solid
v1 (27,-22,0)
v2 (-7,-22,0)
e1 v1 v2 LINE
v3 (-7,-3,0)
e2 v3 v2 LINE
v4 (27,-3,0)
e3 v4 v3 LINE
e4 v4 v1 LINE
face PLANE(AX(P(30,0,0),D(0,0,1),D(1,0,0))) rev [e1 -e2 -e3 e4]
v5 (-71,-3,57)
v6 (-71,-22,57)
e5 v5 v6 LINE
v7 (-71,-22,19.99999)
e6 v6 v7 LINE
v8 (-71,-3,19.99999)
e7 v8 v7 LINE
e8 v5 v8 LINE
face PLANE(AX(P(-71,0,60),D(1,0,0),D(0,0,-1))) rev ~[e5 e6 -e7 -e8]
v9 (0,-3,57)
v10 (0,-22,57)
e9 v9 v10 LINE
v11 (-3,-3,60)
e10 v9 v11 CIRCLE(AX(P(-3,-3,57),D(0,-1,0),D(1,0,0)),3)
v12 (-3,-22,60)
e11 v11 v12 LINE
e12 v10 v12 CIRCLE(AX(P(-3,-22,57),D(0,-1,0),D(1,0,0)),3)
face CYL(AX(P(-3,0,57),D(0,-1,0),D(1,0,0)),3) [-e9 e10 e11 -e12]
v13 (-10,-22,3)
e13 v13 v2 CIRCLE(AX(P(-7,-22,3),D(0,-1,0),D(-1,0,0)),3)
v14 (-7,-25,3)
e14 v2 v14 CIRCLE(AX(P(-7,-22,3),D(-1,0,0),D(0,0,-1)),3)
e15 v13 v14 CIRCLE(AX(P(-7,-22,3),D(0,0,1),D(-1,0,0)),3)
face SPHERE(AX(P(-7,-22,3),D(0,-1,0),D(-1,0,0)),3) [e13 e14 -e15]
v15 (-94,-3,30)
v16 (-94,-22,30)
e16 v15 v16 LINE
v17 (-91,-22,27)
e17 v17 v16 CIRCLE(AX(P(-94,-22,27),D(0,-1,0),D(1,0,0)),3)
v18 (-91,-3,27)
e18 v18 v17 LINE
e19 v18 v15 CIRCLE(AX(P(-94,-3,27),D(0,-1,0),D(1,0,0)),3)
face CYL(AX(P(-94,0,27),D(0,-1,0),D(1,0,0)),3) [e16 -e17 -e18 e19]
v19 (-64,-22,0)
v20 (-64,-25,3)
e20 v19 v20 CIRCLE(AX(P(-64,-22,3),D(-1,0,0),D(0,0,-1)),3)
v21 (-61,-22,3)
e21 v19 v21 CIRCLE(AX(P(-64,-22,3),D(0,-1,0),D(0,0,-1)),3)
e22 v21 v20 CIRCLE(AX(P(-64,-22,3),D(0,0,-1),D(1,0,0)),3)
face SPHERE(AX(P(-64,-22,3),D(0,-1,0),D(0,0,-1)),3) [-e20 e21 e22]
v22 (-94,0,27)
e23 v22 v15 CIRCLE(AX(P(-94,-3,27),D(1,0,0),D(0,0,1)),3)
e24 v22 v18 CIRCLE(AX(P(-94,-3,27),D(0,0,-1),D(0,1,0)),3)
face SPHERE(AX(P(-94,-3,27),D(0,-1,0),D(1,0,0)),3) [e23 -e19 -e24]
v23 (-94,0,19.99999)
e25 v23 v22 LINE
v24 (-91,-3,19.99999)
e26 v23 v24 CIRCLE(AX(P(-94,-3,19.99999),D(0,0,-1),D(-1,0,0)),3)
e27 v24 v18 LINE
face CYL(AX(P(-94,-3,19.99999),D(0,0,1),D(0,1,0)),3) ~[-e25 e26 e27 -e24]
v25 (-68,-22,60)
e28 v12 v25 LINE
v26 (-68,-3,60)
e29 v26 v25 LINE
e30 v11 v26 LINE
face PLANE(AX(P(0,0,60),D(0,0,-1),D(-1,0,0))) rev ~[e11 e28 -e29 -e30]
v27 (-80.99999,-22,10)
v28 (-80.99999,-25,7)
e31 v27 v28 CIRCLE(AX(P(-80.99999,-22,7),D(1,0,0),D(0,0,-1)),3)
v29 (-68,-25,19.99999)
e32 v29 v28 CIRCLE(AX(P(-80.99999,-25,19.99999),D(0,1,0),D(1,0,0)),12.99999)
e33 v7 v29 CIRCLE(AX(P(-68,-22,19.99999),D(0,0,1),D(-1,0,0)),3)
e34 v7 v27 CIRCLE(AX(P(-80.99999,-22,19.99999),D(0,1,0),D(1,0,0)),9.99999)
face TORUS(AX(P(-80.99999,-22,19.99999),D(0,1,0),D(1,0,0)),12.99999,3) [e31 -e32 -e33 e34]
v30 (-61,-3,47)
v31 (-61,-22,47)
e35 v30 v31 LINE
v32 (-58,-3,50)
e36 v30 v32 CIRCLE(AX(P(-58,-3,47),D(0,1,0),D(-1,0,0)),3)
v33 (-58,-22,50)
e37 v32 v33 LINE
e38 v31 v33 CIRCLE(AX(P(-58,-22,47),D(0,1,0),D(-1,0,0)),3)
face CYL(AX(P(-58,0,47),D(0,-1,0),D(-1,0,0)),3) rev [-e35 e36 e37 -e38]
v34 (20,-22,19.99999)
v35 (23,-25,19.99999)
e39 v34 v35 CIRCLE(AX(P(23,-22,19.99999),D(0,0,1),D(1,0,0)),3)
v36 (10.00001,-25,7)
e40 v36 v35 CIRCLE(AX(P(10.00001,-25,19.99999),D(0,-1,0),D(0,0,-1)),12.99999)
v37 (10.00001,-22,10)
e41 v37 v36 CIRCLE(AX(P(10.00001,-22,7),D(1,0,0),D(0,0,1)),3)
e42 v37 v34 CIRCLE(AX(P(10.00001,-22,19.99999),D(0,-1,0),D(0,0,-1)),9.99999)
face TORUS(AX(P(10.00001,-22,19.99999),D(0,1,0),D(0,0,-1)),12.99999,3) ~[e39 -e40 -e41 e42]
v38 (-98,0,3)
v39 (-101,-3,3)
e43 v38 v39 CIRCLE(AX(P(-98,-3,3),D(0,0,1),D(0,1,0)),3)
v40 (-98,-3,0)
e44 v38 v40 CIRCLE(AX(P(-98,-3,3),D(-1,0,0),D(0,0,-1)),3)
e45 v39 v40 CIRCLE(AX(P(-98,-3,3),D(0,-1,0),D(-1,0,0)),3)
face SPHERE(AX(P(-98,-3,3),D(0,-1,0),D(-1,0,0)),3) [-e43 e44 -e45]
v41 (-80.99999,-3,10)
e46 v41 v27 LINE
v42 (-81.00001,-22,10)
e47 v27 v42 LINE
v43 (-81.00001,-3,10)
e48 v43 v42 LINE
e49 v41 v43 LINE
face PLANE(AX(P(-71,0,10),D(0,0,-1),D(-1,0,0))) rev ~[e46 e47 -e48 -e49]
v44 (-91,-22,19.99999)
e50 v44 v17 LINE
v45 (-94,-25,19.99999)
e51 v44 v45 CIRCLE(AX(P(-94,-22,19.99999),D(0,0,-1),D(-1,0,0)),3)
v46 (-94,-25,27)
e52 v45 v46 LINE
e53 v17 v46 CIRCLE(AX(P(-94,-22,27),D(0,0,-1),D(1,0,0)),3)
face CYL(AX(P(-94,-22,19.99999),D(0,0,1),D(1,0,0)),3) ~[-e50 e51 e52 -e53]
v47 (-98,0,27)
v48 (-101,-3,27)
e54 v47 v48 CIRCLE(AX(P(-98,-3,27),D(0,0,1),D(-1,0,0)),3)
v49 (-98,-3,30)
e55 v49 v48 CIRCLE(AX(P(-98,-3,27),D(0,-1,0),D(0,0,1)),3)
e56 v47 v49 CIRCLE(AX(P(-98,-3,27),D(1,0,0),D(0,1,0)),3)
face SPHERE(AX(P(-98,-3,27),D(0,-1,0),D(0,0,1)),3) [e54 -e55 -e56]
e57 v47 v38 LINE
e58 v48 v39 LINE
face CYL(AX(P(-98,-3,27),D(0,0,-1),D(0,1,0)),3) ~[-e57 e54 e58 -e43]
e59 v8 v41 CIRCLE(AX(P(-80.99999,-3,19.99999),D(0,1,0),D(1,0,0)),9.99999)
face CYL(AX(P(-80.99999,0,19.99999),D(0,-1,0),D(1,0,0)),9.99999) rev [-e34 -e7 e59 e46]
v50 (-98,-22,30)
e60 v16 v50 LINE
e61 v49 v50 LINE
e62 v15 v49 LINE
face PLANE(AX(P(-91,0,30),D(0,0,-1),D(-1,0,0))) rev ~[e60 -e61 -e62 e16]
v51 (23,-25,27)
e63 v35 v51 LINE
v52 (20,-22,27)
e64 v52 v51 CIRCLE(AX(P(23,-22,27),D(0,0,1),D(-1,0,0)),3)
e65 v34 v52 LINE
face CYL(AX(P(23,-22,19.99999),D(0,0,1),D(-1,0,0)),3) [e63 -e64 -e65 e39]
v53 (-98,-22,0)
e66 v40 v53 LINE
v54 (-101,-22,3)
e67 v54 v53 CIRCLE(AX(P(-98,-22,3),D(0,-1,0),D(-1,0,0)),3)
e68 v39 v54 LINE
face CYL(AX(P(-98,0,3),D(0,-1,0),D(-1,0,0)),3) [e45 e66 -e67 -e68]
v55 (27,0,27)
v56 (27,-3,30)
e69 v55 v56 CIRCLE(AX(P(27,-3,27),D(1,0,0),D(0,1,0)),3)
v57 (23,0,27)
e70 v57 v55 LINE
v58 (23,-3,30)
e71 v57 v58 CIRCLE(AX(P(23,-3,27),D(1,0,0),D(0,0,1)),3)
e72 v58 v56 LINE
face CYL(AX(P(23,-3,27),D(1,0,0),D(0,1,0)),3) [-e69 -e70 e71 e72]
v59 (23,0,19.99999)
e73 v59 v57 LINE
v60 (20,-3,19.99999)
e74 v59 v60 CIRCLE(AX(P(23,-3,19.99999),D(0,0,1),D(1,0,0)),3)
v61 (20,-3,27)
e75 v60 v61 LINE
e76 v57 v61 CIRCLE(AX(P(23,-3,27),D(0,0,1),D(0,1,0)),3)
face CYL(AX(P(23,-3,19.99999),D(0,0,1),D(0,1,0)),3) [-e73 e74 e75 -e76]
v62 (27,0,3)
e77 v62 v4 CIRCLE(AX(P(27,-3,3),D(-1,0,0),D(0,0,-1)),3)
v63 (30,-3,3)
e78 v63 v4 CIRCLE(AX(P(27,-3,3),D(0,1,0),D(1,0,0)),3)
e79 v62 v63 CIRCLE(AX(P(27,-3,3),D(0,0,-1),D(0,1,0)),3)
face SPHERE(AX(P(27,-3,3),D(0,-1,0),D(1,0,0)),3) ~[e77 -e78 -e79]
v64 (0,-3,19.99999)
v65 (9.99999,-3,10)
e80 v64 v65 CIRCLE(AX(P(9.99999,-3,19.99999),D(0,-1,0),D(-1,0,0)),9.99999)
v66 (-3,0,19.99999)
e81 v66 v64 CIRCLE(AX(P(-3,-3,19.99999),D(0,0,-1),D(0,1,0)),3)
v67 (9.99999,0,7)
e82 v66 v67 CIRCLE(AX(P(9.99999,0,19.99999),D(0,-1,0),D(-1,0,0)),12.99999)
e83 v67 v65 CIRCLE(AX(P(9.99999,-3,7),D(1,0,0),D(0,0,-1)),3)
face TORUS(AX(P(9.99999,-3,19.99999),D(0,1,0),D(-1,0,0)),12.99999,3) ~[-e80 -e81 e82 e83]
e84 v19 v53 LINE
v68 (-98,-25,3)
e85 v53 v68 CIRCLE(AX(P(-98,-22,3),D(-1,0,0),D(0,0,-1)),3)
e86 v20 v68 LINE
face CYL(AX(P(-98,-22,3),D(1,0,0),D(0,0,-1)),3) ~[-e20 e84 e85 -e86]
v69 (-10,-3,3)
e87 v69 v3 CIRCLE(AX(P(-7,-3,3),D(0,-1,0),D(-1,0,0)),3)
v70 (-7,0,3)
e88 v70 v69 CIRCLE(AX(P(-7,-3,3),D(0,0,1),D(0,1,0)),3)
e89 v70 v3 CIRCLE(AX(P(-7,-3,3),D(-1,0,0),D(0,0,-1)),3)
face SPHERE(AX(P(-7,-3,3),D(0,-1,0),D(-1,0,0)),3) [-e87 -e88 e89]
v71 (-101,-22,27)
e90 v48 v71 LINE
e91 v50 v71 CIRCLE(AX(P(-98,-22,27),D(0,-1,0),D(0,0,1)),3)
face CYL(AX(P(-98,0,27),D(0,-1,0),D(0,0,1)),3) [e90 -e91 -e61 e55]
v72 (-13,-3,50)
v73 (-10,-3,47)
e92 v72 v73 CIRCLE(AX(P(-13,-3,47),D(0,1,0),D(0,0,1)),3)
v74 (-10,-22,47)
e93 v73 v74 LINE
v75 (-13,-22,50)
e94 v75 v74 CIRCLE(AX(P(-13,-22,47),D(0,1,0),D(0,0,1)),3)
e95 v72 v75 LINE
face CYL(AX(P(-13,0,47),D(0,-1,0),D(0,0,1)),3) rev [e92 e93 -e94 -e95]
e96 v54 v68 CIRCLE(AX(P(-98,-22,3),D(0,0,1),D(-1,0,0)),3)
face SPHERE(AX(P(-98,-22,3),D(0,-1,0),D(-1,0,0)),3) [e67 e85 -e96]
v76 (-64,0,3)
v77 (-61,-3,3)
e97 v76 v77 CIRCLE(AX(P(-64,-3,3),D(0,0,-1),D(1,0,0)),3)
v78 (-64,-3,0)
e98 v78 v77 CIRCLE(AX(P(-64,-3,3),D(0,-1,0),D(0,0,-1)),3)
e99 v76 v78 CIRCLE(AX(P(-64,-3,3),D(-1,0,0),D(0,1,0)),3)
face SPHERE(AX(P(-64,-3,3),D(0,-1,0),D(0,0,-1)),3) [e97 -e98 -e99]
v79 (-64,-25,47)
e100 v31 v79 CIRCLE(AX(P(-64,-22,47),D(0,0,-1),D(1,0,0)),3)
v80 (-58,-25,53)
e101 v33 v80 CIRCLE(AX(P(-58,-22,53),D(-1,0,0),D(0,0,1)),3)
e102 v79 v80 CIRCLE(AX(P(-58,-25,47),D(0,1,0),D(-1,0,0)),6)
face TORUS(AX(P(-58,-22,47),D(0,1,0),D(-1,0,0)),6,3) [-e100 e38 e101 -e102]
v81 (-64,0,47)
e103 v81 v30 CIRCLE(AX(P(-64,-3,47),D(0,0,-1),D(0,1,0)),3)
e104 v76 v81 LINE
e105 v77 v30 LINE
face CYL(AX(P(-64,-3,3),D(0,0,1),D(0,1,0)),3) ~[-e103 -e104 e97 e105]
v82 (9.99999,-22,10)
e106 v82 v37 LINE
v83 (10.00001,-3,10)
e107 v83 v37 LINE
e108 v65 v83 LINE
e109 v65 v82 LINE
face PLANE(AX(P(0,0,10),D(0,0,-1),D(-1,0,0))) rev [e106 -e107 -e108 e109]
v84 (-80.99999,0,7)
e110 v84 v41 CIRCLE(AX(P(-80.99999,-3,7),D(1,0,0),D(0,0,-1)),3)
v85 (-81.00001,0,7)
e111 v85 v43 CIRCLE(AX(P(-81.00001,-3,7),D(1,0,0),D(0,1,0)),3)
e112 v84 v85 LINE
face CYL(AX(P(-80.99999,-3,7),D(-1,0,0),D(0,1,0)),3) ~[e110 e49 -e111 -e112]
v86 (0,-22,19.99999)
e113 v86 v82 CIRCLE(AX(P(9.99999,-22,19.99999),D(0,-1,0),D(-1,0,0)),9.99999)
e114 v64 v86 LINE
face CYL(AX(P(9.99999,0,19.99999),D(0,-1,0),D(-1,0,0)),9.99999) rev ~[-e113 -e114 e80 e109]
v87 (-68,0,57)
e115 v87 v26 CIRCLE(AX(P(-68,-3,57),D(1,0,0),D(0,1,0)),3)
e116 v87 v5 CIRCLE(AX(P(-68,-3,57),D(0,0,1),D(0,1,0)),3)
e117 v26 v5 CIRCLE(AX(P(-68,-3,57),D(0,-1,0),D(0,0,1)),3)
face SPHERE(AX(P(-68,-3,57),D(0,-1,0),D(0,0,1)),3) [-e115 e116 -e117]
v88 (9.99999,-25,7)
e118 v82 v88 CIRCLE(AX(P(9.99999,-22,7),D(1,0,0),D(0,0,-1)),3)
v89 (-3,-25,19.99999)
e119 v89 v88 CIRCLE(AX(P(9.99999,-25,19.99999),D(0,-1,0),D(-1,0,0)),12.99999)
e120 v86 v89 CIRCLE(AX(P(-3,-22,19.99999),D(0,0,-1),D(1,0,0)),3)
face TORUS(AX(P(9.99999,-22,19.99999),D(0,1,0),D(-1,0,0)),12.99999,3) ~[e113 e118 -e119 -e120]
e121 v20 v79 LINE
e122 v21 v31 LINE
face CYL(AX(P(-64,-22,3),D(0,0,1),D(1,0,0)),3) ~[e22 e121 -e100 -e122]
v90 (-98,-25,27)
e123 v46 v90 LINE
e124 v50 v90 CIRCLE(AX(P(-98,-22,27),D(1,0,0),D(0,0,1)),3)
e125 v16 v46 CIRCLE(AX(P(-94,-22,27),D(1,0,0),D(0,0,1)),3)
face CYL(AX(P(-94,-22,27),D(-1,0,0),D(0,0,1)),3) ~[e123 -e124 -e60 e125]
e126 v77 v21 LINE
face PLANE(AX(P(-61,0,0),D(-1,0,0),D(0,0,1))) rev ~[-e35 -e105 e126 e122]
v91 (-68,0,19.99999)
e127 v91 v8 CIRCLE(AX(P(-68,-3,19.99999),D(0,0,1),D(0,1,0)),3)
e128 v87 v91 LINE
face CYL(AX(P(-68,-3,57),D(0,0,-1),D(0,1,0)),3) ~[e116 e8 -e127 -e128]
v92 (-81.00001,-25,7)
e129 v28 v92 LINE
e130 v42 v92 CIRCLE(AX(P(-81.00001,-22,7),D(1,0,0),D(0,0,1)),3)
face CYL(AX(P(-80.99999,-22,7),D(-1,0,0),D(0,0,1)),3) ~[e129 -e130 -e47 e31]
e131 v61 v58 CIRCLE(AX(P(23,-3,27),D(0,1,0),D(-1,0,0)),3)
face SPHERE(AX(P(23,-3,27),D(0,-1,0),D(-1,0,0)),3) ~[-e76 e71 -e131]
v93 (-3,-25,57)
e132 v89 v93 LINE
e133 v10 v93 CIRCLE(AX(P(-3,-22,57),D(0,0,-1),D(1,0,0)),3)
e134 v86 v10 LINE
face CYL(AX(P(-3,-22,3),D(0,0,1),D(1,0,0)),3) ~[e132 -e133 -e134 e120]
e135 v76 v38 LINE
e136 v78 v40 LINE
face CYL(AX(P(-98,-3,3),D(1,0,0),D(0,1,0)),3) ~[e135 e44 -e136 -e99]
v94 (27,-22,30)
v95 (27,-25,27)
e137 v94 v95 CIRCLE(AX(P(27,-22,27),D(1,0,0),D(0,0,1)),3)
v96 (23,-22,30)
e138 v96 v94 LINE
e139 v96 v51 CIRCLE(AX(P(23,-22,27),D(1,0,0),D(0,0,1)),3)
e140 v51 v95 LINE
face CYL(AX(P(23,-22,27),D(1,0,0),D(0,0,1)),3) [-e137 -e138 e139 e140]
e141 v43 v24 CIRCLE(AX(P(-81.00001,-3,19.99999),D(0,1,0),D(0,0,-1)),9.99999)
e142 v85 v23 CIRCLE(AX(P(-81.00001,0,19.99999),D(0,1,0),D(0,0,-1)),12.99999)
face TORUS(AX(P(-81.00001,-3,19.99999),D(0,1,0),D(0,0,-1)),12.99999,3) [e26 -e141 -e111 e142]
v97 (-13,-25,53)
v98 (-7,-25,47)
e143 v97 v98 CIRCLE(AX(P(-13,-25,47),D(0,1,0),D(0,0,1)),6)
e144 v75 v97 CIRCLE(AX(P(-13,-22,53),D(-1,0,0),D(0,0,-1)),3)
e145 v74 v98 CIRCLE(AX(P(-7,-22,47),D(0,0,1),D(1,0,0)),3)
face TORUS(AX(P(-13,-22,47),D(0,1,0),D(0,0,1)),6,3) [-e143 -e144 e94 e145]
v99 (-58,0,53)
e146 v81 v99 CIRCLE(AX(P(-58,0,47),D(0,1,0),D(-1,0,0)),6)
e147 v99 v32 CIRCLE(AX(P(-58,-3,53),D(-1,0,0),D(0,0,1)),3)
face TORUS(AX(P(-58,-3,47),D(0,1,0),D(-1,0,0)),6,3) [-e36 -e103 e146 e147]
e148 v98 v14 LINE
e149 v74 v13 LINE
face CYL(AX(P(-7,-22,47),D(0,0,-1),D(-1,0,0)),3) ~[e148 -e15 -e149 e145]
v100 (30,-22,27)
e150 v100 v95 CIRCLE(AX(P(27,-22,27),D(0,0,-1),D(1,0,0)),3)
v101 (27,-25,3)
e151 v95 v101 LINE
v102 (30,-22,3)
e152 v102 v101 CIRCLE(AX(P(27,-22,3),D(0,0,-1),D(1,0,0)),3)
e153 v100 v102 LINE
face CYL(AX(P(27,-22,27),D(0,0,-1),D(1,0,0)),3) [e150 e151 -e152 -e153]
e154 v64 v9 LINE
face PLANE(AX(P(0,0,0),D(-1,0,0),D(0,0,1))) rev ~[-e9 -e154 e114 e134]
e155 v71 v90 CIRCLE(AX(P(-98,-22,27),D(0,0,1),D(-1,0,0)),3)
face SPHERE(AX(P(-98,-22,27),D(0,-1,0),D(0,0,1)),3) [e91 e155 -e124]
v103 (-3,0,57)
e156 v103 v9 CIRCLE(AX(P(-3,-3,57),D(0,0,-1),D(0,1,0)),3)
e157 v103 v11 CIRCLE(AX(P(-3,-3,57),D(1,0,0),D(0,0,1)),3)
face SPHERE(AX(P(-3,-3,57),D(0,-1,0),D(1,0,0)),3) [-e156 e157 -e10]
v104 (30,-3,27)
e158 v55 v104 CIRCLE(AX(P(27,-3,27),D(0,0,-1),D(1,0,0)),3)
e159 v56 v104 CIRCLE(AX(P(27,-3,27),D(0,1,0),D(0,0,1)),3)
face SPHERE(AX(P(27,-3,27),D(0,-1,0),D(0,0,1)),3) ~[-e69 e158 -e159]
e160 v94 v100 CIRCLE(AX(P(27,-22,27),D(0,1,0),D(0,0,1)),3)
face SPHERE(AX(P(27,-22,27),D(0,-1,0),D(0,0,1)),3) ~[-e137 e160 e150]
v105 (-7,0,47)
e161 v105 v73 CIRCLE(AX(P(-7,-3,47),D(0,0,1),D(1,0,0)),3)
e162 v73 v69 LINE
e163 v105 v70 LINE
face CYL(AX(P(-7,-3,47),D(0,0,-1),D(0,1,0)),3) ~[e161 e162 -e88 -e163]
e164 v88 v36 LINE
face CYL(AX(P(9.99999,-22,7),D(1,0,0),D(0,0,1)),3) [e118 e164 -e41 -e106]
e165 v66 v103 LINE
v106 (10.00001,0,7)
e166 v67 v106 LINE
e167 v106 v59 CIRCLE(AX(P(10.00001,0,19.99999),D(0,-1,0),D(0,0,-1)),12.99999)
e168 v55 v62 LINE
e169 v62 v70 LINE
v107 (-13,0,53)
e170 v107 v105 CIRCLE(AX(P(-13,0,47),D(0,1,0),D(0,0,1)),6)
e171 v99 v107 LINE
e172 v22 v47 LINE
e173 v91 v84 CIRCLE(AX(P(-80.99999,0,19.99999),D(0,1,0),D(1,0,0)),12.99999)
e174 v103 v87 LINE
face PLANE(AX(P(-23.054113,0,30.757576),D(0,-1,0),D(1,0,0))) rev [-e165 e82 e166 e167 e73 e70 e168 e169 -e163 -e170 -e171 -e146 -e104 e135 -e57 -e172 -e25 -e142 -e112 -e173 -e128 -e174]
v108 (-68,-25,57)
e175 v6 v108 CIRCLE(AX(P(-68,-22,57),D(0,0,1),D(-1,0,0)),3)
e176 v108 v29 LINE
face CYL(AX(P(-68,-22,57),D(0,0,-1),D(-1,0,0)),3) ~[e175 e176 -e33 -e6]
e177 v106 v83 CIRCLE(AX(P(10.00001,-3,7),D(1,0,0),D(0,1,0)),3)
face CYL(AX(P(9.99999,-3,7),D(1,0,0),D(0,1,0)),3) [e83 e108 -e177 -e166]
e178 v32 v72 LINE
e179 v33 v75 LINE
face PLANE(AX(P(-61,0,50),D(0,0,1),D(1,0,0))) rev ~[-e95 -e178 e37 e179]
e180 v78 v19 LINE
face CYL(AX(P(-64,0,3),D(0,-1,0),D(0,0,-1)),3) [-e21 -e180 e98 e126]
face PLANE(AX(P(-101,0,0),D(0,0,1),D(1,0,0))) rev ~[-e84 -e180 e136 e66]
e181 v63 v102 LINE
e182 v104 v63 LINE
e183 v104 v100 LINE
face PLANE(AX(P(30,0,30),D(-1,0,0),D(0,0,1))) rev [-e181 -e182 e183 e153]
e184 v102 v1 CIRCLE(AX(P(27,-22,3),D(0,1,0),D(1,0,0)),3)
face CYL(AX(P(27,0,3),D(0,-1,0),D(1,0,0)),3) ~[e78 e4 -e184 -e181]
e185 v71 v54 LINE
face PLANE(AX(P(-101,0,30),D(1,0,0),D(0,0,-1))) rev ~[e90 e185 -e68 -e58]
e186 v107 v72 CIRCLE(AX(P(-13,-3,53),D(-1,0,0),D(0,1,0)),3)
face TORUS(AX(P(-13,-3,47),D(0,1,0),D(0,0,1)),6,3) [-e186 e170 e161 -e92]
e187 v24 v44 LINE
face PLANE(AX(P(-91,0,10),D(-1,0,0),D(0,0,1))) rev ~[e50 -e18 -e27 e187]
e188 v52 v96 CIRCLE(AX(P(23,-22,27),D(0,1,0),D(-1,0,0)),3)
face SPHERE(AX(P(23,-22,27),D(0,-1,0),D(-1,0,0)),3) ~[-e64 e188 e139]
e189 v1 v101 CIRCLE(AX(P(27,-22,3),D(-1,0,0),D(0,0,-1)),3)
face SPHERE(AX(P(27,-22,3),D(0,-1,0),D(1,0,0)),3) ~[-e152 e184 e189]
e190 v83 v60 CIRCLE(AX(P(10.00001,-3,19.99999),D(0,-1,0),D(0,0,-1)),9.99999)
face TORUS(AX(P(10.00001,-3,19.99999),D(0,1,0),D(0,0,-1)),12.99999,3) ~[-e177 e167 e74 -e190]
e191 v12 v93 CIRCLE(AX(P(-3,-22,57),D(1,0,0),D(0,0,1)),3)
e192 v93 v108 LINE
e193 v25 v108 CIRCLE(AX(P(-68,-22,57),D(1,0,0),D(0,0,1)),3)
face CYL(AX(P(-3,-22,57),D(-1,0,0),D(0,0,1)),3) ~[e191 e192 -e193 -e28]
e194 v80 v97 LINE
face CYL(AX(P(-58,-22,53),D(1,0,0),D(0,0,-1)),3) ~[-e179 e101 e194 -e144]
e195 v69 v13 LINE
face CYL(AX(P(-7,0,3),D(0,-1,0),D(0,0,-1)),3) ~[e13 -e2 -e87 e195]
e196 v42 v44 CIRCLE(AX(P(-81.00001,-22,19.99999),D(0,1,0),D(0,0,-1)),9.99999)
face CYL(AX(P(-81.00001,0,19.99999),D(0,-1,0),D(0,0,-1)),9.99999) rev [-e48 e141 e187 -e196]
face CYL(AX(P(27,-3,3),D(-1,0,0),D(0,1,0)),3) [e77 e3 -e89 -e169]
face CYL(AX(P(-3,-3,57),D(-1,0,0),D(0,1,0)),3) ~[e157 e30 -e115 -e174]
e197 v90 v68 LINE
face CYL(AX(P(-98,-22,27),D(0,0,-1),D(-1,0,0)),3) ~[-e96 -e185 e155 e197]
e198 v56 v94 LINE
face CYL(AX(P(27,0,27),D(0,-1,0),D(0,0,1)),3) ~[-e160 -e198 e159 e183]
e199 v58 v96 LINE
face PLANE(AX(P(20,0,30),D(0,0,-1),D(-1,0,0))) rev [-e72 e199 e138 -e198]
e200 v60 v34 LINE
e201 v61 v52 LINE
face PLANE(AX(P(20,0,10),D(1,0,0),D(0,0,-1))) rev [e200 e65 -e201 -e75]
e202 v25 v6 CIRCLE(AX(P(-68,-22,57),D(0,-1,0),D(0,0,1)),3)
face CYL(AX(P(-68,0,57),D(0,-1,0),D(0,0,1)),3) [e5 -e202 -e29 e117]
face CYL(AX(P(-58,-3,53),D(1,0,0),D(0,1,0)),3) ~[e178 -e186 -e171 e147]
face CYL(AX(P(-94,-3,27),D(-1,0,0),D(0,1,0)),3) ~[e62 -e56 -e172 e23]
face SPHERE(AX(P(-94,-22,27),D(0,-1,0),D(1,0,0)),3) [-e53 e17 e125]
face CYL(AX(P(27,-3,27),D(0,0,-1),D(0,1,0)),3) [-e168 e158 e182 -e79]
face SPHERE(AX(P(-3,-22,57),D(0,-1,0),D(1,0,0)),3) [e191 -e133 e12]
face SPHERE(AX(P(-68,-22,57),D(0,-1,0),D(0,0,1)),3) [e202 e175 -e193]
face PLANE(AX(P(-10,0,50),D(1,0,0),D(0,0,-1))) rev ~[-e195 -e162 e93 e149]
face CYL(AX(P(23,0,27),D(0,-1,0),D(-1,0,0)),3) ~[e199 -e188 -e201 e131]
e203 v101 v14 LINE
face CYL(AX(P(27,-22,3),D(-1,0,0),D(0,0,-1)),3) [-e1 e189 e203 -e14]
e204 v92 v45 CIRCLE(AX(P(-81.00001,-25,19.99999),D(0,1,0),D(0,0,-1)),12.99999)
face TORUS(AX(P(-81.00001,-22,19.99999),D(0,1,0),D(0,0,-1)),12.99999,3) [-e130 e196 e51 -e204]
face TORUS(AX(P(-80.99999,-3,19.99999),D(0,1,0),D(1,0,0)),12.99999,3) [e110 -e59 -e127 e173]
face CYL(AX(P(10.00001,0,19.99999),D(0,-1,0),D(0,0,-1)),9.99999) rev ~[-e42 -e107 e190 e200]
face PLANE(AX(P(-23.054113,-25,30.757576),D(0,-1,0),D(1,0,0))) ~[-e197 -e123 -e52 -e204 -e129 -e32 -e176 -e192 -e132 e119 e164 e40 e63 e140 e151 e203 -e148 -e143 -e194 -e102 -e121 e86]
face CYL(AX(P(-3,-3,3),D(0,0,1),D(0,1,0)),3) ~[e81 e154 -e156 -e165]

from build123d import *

# Parameters (mm, degrees)
F1_DEPTH = 25
F2_R     = 3
F3_R     = 9.99999
F5_R     = 3


# Not quite as in the source:
# - a fillet or chamfer is up to 0.001 mm smaller than in the source, because OpenCascade refuses the exact size


with BuildPart() as f1:
    # F0 (on Front) → F1 (new body)
    with BuildSketch(Plane.XZ):
        Polygon((-10, 0), (0, 0), (0, 60), (-71, 60), (-71, 10), (-91, 10), (-91, 30), (-101, 30), (-101, 0), (-61, 0), (-61, 50), (-10, 50), align=None)
    extrude(amount=F1_DEPTH)

    # F2
    f2_edges = [f1.edges().sort_by_distance(p)[0] for p in [
        (-71, -12.5, 60),
        (0, -12.5, 60),
        (-10, -12.5, 50),
        (-61, -12.5, 50),
        (-61, -12.5, 0),
        (-10, -12.5, 0),
        (0, -12.5, 0),
        (-101, -12.5, 0),
        (-101, -12.5, 30),
        (-91, -12.5, 30),
    ]]
    fillet(f2_edges, radius=F2_R)

    # F3 (radius 10 in the source; OpenCascade refuses exactly that, so slightly less here)
    f3_edges = [f1.edges().sort_by_distance(p)[0] for p in [
        (-91, -12.5, 10),
        (-71, -12.5, 10),
    ]]
    fillet(f3_edges, radius=F3_R)

    # F5
    f5_edges = [f1.edges().sort_by_distance(p)[0] for p in [
        (-71, -25, 38.499995),
        (-73.928929, -25, 12.928929),
        (-70.12132, -25, 59.12132),
        (-81, -25, 10),
        (-35.5, -25, 60),
        (-88.071071, -25, 12.928929),
        (-0.87868, -25, 59.12132),
        (-91, -25, 23.499995),
        (0, -25, 30),
        (-91.87868, -25, 29.12132),
        (-0.87868, -25, 0.87868),
        (-96, -25, 30),
        (-5, -25, 0),
        (-100.12132, -25, 29.12132),
        (-9.12132, -25, 0.87868),
        (-101, -25, 15),
        (-10, -25, 25),
        (-100.12132, -25, 0.87868),
        (-10.87868, -25, 49.12132),
        (-81, -25, 0),
        (-35.5, -25, 50),
        (-61.87868, -25, 0.87868),
        (-60.12132, -25, 49.12132),
        (-61, -25, 25),
        (-71, 0, 38.499995),
        (-73.928929, 0, 12.928929),
        (-70.12132, 0, 59.12132),
        (-81, 0, 10),
        (-35.5, 0, 60),
        (-88.071071, 0, 12.928929),
        (-0.87868, 0, 59.12132),
        (-91, 0, 23.499995),
        (0, 0, 30),
        (-91.87868, 0, 29.12132),
        (-0.87868, 0, 0.87868),
        (-96, 0, 30),
        (-5, 0, 0),
        (-100.12132, 0, 29.12132),
        (-9.12132, 0, 0.87868),
        (-101, 0, 15),
        (-10, 0, 25),
        (-100.12132, 0, 0.87868),
        (-10.87868, 0, 49.12132),
        (-81, 0, 0),
        (-35.5, 0, 50),
        (-61.87868, 0, 0.87868),
        (-60.12132, 0, 49.12132),
        (-61, 0, 25),
    ]]
    fillet(f5_edges, radius=F5_R)

    # F6: F1 across plane


with BuildPart() as f1_1:
    add(f1.part)
    add(f1.part.mirror(Plane(origin=(-35.5, -12.5, 34.2499975), x_dir=(0, 1, 0), z_dir=(1, 0, 0))))


solid = f1_1.part
